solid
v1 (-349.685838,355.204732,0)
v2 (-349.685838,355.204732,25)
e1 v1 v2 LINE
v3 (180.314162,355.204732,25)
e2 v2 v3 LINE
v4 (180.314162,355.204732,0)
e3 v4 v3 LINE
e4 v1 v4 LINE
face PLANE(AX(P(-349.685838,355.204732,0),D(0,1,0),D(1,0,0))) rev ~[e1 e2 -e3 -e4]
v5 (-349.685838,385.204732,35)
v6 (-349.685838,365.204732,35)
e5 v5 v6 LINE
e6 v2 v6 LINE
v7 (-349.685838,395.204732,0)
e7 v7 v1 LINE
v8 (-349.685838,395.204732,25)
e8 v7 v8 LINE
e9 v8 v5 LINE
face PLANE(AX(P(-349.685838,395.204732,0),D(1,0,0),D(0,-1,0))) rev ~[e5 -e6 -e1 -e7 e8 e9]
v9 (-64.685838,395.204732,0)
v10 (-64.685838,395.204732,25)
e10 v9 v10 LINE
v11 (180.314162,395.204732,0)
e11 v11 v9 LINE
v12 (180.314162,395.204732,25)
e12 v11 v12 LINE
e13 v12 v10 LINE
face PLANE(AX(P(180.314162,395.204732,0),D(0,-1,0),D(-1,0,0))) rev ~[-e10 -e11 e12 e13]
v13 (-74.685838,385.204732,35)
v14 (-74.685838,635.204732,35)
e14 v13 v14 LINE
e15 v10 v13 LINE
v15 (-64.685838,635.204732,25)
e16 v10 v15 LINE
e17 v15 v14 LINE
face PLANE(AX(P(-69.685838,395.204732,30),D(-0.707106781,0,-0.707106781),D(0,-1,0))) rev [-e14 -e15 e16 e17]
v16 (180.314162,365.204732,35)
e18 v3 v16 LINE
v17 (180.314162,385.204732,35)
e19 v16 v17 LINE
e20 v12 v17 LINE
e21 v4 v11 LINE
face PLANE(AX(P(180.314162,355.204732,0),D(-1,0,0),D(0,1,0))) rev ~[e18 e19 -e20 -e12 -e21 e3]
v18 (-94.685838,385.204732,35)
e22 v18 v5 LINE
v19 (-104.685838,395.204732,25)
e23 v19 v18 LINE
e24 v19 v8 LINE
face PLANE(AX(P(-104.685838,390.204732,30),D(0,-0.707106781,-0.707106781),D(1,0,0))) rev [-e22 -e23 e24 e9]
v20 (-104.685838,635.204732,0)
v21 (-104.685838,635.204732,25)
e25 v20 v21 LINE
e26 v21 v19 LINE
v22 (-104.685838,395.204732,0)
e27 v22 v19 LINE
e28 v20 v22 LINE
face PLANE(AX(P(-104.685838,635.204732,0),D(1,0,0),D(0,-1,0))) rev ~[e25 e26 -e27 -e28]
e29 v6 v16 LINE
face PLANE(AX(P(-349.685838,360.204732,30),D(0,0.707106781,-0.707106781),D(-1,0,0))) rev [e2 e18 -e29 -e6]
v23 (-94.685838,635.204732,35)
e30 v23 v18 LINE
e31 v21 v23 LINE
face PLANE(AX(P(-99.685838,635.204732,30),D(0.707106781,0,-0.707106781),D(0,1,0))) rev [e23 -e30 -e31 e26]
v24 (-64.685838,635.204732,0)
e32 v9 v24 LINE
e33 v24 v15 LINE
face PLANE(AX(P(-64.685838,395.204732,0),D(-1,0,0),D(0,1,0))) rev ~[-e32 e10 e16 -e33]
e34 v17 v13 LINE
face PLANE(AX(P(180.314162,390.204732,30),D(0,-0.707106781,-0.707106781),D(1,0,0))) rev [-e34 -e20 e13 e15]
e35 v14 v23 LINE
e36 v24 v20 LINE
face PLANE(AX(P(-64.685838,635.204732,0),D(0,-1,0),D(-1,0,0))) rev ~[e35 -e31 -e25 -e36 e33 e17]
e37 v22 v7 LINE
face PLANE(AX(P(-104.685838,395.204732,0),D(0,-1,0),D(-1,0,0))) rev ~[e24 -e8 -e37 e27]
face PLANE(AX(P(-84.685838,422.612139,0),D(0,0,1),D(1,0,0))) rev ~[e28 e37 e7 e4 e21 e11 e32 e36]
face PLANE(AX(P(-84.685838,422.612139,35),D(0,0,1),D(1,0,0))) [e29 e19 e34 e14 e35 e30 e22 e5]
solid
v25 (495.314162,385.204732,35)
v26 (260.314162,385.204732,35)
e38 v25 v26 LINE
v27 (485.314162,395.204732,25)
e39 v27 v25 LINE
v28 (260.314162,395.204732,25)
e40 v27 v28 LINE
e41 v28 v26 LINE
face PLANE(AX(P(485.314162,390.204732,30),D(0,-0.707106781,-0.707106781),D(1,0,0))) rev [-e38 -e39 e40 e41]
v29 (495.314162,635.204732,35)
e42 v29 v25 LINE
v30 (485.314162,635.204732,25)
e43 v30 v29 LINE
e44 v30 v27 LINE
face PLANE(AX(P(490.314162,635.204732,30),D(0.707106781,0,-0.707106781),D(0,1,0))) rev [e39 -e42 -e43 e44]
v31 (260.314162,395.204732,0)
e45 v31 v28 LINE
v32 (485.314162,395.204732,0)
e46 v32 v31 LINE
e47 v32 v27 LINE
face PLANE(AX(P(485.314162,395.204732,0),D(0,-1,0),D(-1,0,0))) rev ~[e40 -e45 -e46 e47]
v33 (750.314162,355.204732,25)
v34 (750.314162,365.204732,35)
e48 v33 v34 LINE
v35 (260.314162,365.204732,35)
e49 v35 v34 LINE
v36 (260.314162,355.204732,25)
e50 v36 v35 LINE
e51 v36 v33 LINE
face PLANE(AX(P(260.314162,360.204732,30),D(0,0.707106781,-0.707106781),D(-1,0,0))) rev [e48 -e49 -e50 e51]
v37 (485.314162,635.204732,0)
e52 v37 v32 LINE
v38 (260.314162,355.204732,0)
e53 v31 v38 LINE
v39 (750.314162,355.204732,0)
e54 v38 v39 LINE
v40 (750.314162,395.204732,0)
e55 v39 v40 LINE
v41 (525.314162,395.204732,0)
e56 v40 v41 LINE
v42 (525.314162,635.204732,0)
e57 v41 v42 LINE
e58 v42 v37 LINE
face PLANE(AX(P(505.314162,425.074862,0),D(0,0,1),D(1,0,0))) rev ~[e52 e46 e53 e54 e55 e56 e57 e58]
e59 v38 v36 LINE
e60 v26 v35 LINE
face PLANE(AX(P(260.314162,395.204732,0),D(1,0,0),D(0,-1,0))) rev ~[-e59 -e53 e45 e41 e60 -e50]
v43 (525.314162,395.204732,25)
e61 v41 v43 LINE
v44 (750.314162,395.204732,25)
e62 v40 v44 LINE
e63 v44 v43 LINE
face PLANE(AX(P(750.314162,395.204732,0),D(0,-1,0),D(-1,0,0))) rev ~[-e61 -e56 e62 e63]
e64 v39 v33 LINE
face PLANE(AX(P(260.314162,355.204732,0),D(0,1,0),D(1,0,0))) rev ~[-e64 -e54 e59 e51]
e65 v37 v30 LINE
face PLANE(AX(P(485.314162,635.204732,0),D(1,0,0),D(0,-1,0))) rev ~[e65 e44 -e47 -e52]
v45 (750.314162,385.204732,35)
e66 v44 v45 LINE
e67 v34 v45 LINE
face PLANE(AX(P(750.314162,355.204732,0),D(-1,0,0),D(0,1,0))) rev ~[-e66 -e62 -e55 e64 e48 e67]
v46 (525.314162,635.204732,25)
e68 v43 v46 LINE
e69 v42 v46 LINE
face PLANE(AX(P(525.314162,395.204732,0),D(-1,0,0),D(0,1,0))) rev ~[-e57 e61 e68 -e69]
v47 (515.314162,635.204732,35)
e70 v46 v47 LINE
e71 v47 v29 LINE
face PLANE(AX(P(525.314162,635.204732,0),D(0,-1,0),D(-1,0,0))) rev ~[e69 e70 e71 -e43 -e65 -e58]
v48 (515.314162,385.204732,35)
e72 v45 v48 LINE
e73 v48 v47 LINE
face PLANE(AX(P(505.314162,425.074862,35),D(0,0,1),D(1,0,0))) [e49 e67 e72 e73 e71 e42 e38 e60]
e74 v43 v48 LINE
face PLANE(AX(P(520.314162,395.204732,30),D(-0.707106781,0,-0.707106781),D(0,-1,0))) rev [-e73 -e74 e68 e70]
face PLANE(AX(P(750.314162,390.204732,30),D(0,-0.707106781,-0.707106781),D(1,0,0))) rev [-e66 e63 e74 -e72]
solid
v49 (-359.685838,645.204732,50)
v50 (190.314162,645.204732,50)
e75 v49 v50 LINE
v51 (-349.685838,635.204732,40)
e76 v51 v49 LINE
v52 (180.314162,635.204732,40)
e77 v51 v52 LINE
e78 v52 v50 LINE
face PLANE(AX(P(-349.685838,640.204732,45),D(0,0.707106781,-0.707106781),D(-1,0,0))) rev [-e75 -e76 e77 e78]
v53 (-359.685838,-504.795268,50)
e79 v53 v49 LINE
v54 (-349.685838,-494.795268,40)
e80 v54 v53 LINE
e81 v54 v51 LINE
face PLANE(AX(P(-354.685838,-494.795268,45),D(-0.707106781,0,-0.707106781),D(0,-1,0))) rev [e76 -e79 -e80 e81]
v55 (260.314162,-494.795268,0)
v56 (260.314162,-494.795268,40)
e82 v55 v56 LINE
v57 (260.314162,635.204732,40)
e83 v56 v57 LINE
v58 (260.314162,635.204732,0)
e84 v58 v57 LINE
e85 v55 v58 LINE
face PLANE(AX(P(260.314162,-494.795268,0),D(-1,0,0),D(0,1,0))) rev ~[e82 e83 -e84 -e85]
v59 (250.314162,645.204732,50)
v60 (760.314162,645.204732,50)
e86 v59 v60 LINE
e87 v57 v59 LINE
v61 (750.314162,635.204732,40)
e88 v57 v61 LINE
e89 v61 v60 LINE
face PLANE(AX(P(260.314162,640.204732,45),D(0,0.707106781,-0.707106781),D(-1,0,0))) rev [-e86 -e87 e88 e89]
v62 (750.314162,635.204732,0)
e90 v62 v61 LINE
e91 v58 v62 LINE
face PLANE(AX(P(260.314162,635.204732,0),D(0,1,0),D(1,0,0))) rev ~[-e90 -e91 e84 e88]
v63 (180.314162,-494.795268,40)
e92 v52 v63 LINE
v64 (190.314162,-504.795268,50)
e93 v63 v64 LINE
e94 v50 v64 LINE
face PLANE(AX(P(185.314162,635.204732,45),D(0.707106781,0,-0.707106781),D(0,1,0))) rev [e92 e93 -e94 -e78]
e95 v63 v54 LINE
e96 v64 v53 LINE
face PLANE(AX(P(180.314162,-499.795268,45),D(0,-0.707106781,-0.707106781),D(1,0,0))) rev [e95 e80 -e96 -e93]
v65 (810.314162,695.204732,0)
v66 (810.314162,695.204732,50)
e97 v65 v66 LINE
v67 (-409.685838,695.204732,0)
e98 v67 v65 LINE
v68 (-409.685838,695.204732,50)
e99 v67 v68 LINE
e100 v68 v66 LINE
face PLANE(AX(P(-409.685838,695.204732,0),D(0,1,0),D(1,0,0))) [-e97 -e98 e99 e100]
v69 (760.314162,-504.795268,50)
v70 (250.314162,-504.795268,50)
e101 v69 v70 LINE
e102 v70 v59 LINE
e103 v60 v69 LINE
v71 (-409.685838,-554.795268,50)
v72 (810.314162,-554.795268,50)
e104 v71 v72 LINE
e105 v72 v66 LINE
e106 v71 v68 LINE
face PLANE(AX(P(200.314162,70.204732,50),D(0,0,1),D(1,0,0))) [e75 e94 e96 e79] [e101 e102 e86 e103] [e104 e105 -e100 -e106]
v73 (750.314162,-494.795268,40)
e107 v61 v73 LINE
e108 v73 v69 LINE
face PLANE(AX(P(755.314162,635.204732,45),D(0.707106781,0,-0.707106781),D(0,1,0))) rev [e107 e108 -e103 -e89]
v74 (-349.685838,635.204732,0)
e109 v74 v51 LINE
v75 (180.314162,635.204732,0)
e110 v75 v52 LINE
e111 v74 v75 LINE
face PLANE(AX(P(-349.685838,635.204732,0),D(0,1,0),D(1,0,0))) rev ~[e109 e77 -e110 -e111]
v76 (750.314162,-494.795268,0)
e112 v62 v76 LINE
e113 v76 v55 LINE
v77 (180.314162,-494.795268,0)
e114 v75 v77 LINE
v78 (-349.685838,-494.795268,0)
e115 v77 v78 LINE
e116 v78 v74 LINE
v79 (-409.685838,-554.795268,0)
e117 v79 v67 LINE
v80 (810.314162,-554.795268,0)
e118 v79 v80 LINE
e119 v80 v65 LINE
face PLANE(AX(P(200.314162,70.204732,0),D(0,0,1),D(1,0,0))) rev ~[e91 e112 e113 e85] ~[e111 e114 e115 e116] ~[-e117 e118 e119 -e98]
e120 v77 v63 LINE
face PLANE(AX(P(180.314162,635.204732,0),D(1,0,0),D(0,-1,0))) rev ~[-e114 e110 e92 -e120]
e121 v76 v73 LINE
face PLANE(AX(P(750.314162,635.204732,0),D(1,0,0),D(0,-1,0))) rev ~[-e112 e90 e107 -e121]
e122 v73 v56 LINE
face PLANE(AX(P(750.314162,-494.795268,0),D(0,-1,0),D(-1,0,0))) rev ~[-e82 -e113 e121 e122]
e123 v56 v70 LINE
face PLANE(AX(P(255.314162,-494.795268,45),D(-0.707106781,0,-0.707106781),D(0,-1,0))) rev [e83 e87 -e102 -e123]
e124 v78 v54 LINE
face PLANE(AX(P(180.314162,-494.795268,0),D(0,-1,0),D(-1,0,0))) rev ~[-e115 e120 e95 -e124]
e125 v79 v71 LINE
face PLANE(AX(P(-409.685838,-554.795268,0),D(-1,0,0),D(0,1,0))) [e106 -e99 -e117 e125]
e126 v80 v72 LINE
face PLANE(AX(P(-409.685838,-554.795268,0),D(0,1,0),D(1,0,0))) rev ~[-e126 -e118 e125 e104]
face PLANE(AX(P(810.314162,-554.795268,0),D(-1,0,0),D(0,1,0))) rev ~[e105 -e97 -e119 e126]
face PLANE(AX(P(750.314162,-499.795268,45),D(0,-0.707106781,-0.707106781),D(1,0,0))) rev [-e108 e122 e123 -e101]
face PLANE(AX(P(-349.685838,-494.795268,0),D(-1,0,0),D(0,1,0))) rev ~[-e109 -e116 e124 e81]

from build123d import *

# Parameters (mm, degrees)
F0_W      = 1220
F0_H      = 1250
F1_DEPTH  = 50
F2_DEPTH  = 35
F3_SIZE   = 10
F3_2_SIZE = 10
F3_3_SIZE = 10


with BuildPart() as f1:
    # F0 (on Top) → F1 (new body)
    with BuildSketch(Plane.XY):
        with Locations((200.3141621128, 70.2047318473)):
            Rectangle(F0_W, F0_H)
        Polygon((-349.6858378872, -494.7952681527), (-349.6858378872, 355.2047318473), (-349.6858378872, 395.2047318473), (-349.6858378872, 635.2047318473), (-104.6858378872, 635.2047318473), (-64.6858378872, 635.2047318473), (180.3141621128, 635.2047318473), (180.3141621128, 395.2047318473), (180.3141621128, 355.2047318473), (180.3141621128, -494.7952681527), align=None, mode=Mode.SUBTRACT)
        Polygon((260.3141621128, -494.7952681527), (260.3141621128, 355.2047318473), (260.3141621128, 395.2047318473), (260.3141621128, 635.2047318473), (485.3141621128, 635.2047318473), (525.3141621128, 635.2047318473), (750.3141621128, 635.2047318473), (750.3141621128, 395.2047318473), (750.3141621128, 355.2047318473), (750.3141621128, -494.7952681527), align=None, mode=Mode.SUBTRACT)
    extrude(amount=F1_DEPTH)

    # F3
    f3_edges = [f1.edges().sort_by_distance(p)[0] for p in [
        (-349.685838, 70.204732, 50),
        (-84.685838, 635.204732, 50),
        (180.314162, 70.204732, 50),
        (260.314162, 70.204732, 50),
        (505.314162, 635.204732, 50),
        (750.314162, 70.204732, 50),
        (505.314162, -494.795268, 50),
        (-84.685838, -494.795268, 50),
    ]]
    chamfer(f3_edges, length=F3_SIZE)


with BuildPart() as f2:
    # F0 (on Top) → F2 (new body)
    with BuildSketch(Plane.XY):
        Polygon((-349.6858378872, 395.2047318473), (-349.6858378872, 355.2047318473), (180.3141621128, 355.2047318473), (180.3141621128, 395.2047318473), (-64.6858378872, 395.2047318473), (-64.6858378872, 635.2047318473), (-104.6858378872, 635.2047318473), (-104.6858378872, 395.2047318473), align=None)
    extrude(amount=F2_DEPTH)

    # F3#2
    f3_2_edges = [f2.edges().sort_by_distance(p)[0] for p in [
        (-84.685838, 355.204732, 35),
        (57.814162, 395.204732, 35),
        (-64.685838, 515.204732, 35),
        (-104.685838, 515.204732, 35),
        (-227.185838, 395.204732, 35),
    ]]
    chamfer(f3_2_edges, length=F3_2_SIZE)


with BuildPart() as f2b:
    # F0 (on Top) → F2, piece 2 (new body)
    with BuildSketch(Plane.XY):
        Polygon((260.3141621128, 395.2047318473), (260.3141621128, 355.2047318473), (750.3141621128, 355.2047318473), (750.3141621128, 395.2047318473), (525.3141621128, 395.2047318473), (525.3141621128, 635.2047318473), (485.3141621128, 635.2047318473), (485.3141621128, 395.2047318473), align=None)
    extrude(amount=F2_DEPTH)

    # F3#3
    f3_3_edges = [f2b.edges().sort_by_distance(p)[0] for p in [
        (505.314162, 355.204732, 35),
        (372.814162, 395.204732, 35),
        (525.314162, 515.204732, 35),
        (637.814162, 395.204732, 35),
        (485.314162, 515.204732, 35),
    ]]
    chamfer(f3_3_edges, length=F3_3_SIZE)


solid = Compound([f1.part, f2.part, f2b.part])
